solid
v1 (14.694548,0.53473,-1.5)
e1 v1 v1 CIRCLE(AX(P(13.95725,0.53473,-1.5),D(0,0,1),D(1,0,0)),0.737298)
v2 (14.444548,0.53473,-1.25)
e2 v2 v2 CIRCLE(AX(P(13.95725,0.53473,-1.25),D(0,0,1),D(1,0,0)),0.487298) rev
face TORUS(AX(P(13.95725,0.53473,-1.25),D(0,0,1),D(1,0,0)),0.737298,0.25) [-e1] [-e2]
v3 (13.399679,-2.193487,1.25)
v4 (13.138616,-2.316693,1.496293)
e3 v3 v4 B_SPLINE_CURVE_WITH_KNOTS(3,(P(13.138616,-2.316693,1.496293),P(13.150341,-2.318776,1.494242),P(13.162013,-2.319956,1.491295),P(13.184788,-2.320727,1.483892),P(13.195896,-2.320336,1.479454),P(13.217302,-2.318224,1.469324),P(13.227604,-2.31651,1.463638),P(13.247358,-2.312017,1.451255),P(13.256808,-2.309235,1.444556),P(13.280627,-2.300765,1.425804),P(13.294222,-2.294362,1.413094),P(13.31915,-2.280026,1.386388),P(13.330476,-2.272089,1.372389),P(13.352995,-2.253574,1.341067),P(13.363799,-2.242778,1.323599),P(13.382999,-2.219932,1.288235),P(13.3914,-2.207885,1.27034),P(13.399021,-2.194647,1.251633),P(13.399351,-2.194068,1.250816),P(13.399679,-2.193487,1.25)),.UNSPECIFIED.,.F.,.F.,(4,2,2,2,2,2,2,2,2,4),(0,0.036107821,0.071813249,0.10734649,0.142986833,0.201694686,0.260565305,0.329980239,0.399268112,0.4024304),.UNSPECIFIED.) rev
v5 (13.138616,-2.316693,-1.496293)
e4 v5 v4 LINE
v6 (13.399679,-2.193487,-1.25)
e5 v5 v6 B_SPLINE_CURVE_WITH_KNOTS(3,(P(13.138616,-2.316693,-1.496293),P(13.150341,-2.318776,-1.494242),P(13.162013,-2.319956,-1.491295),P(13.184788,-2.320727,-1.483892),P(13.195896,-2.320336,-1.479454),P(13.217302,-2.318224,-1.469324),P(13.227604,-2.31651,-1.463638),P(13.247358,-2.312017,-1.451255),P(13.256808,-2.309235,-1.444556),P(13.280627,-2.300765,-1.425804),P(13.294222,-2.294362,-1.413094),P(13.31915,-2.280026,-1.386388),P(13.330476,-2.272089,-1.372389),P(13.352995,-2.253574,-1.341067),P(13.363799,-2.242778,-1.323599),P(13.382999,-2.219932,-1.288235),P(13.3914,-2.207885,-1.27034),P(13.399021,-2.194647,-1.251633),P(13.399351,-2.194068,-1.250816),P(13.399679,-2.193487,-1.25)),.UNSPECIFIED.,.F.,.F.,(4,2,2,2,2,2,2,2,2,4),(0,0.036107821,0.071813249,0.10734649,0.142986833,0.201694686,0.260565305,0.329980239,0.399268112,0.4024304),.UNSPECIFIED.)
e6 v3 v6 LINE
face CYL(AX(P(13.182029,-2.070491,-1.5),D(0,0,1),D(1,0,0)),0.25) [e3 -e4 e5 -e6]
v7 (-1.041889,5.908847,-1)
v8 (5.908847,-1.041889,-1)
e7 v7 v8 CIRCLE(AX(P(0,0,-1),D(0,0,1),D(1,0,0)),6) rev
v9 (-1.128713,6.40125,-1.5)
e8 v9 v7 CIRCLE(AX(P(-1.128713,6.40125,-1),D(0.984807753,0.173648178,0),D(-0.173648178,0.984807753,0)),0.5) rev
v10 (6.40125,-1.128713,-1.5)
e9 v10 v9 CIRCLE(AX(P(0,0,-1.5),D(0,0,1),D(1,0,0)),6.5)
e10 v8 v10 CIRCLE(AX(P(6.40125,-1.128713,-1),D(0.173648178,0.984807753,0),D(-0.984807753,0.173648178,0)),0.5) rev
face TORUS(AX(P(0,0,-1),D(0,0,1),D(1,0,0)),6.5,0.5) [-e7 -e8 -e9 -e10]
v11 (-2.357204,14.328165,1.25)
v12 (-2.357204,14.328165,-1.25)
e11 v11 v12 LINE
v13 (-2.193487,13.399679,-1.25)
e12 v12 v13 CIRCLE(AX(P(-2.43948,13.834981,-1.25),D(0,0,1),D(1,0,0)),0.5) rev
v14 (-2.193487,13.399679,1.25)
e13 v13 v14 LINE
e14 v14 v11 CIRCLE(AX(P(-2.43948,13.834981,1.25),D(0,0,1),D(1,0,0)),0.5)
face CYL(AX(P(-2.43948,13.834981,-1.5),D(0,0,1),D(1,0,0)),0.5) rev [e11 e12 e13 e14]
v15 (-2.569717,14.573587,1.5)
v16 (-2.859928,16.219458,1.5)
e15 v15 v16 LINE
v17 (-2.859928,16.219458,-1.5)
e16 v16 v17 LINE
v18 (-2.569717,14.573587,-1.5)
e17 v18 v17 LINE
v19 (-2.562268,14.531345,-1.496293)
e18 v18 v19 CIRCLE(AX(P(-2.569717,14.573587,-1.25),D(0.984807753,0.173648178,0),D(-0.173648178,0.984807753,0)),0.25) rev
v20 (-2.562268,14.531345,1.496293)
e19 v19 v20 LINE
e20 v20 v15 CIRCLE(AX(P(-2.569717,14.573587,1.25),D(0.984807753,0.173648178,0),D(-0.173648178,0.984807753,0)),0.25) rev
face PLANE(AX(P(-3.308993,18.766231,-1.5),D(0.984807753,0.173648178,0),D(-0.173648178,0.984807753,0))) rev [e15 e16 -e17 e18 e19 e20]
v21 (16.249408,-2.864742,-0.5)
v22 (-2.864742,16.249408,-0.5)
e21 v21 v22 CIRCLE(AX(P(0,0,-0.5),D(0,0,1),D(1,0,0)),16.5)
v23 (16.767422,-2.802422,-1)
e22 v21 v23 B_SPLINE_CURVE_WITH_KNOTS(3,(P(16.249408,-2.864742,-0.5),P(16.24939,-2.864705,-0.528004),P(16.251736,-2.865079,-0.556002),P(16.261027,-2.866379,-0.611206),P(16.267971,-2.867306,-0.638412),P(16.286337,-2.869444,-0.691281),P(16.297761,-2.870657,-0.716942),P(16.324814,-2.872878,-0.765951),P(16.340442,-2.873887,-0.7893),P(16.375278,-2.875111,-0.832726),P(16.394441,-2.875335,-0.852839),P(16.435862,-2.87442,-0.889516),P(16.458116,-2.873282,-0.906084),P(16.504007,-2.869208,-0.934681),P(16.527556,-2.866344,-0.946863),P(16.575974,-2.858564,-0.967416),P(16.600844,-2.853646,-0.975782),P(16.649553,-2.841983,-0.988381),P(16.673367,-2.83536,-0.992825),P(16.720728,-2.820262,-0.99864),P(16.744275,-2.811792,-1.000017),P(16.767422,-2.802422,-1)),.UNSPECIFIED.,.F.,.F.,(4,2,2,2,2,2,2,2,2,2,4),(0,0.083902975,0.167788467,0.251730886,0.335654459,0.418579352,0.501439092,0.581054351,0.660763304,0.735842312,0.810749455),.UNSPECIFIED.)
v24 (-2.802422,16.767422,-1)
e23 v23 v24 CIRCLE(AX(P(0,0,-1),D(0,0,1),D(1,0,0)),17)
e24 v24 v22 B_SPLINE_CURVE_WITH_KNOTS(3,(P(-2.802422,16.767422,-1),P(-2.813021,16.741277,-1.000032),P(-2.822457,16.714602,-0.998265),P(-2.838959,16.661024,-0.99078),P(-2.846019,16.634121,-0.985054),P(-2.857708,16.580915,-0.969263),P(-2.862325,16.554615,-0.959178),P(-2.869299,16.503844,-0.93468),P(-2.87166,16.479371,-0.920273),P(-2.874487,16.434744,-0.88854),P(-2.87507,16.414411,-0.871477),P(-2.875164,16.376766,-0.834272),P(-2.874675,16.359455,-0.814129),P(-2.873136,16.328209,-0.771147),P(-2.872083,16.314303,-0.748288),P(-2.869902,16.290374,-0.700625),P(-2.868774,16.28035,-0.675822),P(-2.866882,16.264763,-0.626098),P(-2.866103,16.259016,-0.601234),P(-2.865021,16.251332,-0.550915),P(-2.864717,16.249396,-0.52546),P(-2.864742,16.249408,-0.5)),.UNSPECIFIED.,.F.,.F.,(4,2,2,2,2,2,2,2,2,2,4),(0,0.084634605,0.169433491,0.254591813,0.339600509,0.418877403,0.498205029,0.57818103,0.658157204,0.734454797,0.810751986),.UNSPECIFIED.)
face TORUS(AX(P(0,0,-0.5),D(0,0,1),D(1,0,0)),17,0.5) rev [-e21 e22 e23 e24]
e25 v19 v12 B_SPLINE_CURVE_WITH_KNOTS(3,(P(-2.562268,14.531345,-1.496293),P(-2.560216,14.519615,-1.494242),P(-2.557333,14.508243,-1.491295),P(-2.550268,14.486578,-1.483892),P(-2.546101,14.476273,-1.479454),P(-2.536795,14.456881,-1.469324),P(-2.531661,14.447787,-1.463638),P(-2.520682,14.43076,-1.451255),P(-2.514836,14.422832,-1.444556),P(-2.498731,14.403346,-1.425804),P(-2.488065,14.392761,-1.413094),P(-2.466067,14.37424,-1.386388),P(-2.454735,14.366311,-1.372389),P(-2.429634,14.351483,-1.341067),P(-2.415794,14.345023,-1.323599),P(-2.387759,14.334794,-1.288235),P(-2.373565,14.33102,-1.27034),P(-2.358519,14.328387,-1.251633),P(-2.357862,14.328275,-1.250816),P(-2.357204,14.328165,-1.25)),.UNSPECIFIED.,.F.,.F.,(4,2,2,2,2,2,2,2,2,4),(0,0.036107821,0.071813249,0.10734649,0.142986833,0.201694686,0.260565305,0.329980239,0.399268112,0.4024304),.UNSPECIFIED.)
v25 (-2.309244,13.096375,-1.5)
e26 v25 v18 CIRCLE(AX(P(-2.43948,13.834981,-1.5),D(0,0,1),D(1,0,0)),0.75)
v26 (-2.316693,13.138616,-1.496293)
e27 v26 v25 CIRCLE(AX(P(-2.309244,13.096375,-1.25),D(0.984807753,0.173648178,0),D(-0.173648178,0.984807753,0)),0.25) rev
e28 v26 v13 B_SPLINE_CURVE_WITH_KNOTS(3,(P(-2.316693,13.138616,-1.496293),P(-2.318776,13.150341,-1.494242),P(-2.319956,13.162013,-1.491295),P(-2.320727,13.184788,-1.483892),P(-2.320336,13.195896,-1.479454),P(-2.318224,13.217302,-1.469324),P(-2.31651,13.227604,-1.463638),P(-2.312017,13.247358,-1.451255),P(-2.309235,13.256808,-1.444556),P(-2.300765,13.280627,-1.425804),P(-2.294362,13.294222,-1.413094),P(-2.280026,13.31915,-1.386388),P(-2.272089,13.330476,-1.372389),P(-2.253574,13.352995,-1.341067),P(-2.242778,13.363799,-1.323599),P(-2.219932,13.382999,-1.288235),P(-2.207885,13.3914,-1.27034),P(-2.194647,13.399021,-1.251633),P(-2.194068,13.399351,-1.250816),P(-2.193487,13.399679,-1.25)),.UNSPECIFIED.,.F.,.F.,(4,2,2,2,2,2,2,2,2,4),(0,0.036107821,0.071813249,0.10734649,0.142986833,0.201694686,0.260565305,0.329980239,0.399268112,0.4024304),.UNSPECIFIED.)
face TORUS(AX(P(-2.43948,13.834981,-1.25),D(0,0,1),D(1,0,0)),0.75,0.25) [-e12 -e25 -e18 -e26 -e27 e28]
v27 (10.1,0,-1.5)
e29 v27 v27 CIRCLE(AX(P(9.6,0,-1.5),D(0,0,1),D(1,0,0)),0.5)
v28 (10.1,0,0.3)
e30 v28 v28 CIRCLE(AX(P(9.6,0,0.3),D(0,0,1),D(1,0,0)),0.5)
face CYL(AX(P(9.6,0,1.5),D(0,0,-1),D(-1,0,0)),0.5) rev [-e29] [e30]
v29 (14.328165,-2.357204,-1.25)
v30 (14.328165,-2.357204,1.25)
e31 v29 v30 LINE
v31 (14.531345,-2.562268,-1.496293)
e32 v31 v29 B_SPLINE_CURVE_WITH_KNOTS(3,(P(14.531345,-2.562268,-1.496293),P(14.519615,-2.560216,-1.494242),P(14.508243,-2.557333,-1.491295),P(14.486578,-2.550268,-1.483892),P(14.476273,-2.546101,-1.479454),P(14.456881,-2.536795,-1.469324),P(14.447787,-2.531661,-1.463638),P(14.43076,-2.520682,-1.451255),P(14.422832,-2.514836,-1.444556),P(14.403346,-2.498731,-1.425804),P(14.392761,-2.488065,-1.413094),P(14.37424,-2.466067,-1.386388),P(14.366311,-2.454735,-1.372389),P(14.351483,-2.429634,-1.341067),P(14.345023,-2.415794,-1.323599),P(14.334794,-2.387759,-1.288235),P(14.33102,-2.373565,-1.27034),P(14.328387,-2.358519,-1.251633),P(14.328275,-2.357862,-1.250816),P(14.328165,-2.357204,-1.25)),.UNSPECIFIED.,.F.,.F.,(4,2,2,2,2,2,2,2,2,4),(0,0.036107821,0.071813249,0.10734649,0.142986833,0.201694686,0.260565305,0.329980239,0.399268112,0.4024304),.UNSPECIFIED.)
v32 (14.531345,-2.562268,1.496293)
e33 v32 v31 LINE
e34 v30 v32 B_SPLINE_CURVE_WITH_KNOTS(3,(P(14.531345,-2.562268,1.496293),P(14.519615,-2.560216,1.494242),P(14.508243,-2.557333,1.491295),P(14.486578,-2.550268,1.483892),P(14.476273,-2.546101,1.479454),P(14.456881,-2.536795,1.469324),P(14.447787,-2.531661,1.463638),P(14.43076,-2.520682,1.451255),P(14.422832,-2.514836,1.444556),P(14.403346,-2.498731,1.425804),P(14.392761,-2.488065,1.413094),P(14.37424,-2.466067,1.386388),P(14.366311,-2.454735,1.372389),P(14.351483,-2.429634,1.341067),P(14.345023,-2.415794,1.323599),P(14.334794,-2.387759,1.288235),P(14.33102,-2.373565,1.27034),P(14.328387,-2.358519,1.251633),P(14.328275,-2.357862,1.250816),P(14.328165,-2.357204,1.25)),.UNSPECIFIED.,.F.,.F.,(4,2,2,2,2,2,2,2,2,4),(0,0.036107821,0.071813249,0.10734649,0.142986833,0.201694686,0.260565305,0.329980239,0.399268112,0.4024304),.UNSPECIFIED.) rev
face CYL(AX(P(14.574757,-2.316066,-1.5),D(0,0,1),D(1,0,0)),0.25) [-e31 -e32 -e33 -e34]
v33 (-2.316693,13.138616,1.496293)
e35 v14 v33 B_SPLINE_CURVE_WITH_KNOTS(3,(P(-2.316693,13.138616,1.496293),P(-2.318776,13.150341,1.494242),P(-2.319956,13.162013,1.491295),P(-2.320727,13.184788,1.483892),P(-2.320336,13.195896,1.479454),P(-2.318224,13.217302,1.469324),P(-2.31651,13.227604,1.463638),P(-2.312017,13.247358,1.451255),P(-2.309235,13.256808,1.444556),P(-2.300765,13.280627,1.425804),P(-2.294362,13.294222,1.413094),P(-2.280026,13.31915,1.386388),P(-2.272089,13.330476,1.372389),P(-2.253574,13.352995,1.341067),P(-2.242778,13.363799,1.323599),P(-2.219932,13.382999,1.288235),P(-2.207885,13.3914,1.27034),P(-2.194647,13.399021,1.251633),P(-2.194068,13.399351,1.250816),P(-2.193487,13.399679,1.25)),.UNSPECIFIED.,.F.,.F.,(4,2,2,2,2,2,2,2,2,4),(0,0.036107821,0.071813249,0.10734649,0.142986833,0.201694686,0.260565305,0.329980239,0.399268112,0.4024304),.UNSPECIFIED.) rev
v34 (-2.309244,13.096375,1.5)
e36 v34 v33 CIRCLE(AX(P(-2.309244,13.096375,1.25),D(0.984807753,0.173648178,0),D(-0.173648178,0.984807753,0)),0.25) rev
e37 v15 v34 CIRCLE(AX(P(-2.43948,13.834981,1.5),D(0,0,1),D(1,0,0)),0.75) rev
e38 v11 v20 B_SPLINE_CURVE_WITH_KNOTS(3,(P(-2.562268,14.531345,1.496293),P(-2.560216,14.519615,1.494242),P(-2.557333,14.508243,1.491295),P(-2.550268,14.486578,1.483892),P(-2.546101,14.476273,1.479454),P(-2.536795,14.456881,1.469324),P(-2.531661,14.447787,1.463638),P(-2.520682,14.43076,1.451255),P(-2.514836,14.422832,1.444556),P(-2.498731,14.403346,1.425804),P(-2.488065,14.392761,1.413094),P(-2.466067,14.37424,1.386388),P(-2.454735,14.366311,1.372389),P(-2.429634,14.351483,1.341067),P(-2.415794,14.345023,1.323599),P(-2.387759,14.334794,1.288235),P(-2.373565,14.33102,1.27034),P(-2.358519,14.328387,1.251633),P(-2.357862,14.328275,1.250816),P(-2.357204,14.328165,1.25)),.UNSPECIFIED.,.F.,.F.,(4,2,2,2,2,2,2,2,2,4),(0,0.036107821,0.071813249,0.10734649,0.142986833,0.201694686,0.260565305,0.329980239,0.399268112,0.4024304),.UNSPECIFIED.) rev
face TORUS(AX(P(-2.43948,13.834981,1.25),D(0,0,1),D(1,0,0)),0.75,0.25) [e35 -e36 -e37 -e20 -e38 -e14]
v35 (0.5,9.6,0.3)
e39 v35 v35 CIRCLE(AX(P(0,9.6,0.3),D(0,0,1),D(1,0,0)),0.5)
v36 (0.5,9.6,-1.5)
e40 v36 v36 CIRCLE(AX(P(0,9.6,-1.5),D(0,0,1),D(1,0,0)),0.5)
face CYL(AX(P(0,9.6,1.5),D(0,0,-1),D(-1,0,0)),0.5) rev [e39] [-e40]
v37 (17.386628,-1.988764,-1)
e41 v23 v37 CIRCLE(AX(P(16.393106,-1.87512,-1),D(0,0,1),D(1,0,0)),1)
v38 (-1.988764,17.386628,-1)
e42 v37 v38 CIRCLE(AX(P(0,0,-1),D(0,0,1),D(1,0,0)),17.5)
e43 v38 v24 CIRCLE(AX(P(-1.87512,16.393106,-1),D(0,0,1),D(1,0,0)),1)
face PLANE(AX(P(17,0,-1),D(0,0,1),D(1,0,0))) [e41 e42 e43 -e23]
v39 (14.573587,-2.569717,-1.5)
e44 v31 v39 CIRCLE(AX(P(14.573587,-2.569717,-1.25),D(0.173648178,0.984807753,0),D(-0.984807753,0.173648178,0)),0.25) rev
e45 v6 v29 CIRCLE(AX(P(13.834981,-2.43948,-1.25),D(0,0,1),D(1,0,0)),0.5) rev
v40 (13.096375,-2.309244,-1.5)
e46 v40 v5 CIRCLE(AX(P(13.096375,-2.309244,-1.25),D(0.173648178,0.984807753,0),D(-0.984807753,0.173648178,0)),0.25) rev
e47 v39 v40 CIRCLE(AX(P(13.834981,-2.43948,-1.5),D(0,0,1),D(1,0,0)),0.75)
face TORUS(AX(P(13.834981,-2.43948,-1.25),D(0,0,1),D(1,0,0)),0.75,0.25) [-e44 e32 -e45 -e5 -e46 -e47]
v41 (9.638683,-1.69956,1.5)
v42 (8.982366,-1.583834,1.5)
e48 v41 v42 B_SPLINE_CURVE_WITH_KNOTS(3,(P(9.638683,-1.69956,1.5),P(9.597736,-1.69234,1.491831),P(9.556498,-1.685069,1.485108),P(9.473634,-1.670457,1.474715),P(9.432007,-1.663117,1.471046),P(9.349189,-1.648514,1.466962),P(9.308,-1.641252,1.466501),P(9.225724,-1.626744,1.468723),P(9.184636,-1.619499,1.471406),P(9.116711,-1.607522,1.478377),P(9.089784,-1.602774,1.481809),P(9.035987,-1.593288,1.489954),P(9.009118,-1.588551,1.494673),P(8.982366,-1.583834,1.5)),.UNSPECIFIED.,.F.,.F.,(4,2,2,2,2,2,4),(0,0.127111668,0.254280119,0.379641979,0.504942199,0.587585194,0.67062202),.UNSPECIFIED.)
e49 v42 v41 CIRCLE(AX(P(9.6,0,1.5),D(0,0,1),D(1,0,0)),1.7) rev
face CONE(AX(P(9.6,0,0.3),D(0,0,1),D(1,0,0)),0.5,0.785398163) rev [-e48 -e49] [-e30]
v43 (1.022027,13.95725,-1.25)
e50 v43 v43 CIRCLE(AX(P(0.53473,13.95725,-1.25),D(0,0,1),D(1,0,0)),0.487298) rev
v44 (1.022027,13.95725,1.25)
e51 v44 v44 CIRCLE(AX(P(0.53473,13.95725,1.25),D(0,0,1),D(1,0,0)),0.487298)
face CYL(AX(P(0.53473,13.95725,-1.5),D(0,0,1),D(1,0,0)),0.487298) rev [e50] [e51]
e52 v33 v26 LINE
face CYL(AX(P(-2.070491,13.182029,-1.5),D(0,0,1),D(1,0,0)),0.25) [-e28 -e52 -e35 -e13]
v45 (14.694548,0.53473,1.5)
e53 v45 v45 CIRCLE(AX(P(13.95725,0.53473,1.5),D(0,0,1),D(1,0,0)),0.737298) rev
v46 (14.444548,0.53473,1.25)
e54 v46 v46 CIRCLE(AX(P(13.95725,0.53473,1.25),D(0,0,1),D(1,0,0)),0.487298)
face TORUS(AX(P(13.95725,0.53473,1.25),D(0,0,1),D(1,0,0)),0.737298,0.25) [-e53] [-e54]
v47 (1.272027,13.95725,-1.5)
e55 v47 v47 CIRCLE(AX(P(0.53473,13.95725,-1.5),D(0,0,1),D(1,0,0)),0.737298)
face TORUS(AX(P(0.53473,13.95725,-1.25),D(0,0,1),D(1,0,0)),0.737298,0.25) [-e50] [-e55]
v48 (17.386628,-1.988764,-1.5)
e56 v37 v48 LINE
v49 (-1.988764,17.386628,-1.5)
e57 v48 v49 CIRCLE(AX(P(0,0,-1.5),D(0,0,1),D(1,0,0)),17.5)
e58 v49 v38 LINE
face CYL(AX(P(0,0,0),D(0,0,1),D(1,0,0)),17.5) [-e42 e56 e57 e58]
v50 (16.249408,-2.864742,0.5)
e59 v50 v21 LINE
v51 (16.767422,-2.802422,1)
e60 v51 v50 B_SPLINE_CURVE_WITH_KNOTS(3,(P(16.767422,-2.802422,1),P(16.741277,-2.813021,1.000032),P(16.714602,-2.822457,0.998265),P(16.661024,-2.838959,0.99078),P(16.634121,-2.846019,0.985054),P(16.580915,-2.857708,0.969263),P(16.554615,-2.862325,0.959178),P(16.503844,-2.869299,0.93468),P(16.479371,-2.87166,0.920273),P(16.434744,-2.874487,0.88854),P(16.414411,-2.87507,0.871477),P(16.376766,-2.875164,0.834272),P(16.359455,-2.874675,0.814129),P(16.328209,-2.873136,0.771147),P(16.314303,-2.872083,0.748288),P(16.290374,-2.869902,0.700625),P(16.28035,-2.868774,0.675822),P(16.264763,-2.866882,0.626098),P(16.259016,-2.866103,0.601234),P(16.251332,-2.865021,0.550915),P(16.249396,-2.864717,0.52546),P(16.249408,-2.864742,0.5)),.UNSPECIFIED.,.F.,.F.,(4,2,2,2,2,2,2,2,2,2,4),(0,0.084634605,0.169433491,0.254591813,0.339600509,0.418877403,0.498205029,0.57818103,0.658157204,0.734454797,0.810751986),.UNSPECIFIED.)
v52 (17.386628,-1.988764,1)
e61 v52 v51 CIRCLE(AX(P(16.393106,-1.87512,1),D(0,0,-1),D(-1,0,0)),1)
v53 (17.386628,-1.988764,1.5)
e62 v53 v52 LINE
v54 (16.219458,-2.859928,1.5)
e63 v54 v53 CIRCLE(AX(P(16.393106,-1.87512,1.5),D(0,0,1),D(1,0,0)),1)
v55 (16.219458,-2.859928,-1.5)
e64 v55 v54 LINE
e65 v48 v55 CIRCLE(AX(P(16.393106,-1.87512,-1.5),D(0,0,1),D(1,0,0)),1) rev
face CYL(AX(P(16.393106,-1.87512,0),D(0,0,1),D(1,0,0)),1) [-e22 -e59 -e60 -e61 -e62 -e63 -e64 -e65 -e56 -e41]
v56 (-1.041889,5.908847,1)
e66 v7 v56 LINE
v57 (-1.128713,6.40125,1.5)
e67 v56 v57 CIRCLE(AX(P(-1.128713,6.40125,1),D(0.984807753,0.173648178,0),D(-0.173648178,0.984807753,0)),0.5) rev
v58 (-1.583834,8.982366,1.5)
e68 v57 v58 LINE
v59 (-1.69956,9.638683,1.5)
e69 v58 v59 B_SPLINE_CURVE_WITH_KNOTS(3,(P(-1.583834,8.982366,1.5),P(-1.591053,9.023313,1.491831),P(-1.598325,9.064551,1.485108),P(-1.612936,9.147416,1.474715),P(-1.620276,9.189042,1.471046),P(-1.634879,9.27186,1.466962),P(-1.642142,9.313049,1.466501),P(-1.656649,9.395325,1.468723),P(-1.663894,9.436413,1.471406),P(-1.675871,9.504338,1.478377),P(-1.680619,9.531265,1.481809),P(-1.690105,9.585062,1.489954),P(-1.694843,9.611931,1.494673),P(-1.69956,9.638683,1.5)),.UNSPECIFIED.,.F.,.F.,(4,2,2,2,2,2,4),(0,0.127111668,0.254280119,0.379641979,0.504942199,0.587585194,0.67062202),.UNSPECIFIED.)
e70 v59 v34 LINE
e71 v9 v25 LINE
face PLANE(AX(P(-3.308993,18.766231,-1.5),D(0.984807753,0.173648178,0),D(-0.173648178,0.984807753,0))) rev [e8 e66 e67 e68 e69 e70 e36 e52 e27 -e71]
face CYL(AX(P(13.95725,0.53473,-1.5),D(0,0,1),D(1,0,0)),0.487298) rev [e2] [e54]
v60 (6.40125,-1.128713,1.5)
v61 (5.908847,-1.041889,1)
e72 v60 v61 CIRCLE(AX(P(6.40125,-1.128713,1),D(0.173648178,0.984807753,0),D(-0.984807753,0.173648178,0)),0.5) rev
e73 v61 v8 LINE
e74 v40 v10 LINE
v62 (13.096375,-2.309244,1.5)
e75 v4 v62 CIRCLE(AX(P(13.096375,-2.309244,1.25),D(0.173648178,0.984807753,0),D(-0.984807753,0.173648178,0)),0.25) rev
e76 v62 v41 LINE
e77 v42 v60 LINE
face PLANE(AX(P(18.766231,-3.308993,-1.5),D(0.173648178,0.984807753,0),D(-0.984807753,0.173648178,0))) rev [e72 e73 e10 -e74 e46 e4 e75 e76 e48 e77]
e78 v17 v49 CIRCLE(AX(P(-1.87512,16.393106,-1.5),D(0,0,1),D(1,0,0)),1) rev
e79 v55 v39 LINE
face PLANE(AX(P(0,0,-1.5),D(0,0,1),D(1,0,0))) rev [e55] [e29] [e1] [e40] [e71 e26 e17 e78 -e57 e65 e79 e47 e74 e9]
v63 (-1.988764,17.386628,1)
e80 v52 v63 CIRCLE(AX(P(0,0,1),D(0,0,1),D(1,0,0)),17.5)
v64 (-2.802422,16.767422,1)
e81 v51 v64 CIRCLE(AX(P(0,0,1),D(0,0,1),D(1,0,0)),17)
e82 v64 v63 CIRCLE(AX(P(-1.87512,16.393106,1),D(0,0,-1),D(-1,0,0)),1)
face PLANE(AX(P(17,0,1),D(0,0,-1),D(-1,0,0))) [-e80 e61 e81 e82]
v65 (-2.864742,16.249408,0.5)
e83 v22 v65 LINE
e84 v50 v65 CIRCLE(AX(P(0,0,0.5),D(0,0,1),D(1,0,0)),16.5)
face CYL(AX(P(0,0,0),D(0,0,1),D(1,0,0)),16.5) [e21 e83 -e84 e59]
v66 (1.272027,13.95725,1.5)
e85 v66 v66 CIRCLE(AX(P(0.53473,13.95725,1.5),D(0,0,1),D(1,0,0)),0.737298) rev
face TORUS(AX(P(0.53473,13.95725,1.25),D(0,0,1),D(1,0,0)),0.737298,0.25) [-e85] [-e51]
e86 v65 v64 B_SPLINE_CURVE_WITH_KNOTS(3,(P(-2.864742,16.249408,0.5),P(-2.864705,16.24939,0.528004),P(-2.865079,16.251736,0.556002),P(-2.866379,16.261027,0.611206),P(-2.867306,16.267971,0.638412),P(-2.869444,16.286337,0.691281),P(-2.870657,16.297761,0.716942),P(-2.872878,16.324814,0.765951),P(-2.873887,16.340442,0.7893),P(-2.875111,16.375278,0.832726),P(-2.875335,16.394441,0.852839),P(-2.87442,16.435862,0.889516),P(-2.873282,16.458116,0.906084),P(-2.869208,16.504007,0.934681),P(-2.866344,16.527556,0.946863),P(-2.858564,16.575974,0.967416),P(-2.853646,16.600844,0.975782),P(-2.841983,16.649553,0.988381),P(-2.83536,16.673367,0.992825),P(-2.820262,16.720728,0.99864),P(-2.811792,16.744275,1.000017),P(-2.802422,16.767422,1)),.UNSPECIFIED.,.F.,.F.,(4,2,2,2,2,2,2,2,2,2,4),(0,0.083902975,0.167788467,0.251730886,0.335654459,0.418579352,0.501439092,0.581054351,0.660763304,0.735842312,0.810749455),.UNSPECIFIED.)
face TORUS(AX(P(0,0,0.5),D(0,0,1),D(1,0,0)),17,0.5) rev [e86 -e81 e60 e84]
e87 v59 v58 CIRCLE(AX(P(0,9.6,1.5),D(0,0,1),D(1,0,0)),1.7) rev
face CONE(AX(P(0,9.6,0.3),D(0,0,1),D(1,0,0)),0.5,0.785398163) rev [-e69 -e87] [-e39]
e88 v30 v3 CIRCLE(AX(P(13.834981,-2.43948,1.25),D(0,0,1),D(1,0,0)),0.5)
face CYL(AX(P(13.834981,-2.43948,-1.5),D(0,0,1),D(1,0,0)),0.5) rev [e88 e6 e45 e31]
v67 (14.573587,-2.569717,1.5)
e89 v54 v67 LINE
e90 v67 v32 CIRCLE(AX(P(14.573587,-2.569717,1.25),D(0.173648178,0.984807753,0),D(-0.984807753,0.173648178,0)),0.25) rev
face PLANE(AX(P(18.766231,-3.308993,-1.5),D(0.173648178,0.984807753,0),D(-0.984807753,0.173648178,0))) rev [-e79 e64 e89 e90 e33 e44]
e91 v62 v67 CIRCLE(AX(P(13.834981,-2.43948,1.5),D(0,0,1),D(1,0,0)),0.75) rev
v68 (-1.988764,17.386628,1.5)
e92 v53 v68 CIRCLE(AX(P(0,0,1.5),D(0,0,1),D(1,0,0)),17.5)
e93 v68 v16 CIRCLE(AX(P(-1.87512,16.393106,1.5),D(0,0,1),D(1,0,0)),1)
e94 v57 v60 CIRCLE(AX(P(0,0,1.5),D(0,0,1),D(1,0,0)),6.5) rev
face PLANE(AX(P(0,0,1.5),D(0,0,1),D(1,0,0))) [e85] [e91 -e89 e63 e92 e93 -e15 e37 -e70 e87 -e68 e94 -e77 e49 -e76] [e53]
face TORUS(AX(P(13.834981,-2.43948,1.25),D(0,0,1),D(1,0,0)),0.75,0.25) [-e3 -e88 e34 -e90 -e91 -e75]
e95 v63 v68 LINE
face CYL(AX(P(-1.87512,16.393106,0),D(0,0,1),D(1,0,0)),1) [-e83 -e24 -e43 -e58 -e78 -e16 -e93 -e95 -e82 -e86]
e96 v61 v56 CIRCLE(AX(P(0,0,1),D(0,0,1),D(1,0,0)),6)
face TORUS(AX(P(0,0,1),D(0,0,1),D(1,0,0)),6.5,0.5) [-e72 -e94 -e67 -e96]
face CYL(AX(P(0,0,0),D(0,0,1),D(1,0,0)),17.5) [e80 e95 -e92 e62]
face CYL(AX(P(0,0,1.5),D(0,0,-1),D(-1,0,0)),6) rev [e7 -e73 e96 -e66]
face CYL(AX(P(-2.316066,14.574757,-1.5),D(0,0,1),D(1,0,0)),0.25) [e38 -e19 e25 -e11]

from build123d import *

# Parameters (mm, degrees)
SKETCH1_R               = 17
SKETCH1_R_2             = 0.5
SKETCH1_R_3             = 6
BOSS_EXTRUDE1_DEPTH     = 1.5
SKETCH7_W               = 0.5
SKETCH7_H               = 0.5
CUT_EXTRUDE1_DEPTH      = 25.794152536
CUT_EXTRUDE1_DEPTH_BACK = 25.794152536
CUT_EXTRUDE2_DEPTH      = 25.929901725
CUT_EXTRUDE2_DEPTH_BACK = 25.929901725
SKETCH5_R               = 0.5
SKETCH5_R_2             = 0.48729794
FILLET1_R               = 0.5
CHAMFER1_SIZE           = 1.2
FILLET2_R               = 1
FILLET3_R               = 0.25


with BuildPart() as part:
    # Sketch1 → Boss-Extrude1 (new, symmetric)
    with BuildSketch(Plane.XY):
        Circle(SKETCH1_R)
        with Locations((9.6, 0)):
            Circle(SKETCH1_R_2, mode=Mode.SUBTRACT)
        Circle(SKETCH1_R_3, mode=Mode.SUBTRACT)
        with Locations((0, -9.6)):
            Circle(SKETCH1_R_2, mode=Mode.SUBTRACT)
        with Locations((-9.6, 0)):
            Circle(SKETCH1_R_2, mode=Mode.SUBTRACT)
        with Locations((0, 9.6)):
            Circle(SKETCH1_R_2, mode=Mode.SUBTRACT)
    extrude(amount=BOSS_EXTRUDE1_DEPTH, both=True)

    # Sketch2 → Cut-Revolve1 (revolve, cut)
    with BuildSketch(Plane(origin=(0, 0, 0), x_dir=(1, 0, 0), z_dir=(0, 1, 0)), mode=Mode.PRIVATE) as cut_revolve1_sk:
        with BuildLine():
            Line((-16.5, -0.5), (-16.5, 0.5))
            ThreePointArc((-16.5, 0.5), (-16.646446609, 0.853553391), (-17, 1))
            Line((-17, 1), (-17, -1))
            ThreePointArc((-17, -1), (-16.646446609, -0.853553391), (-16.5, -0.5))
        make_face()
    revolve(cut_revolve1_sk.sketch.rotate(Axis((0, 0, 0), (0, 0, -1)), 180), axis=Axis((0, 0, 0), (0, 0, -1)), mode=Mode.SUBTRACT)

    # Sketch7 → Revolve1 (revolve)
    with BuildSketch(Plane(origin=(0, 0, 0), x_dir=(1, 0, 0), z_dir=(0, 1, 0))):
        with Locations((17.25, 1.25)):
            Rectangle(SKETCH7_W, SKETCH7_H)
        with Locations((17.25, -1.25)):
            Rectangle(SKETCH7_W, SKETCH7_H)
    revolve(axis=Axis((0, 0, 0), (0, 0, -1)))

    # Sketch4 → Cut-Extrude1 (cut, two sides: drawn at the far end of the back side and taken through both)
    with BuildSketch(Plane.XY.offset(-CUT_EXTRUDE1_DEPTH_BACK)):
        Polygon((-3.30899291, 18.766231333), (0, 0), (18.766231333, -3.30899291), (18.766231333, -21.784688157), (-24.932091475, -21.784688157), (-24.932091475, 18.766231333), align=None)
    extrude(amount=CUT_EXTRUDE1_DEPTH + CUT_EXTRUDE1_DEPTH_BACK, mode=Mode.SUBTRACT)

    # Sketch5 → Cut-Extrude2 (cut, two sides: drawn at the far end of the back side and taken through both)
    with BuildSketch(Plane.XY.offset(1.5).offset(-CUT_EXTRUDE2_DEPTH_BACK)):
        with Locations((-2.439480379, 13.834980723)):
            Circle(SKETCH5_R)
        with Locations((0.534729508, 13.957250241)):
            Circle(SKETCH5_R_2)
        with Locations((13.957250241, 0.534729508)):
            Circle(SKETCH5_R_2)
        with Locations((13.834980723, -2.439480379)):
            Circle(SKETCH5_R)
    extrude(amount=CUT_EXTRUDE2_DEPTH + CUT_EXTRUDE2_DEPTH_BACK, mode=Mode.SUBTRACT)

    # Fillet1
    fillet1_edges = [part.edges().sort_by_distance(p)[0] for p in [
        (4.242640687, 4.242640687, 1.5),
        (4.242640687, 4.242640687, -1.5),
    ]]
    fillet(fillet1_edges, radius=FILLET1_R)

    # Chamfer1
    # the kernel refuses this chamfer: 1.2 mm, written as the material it takes off along each edge
    with BuildSketch(Plane(origin=(9.6, 0, 1.5), x_dir=(1, 0, 0), z_dir=(0, -1, 0))) as chamfer1_piece_1:
        Polygon((0.5 + CHAMFER1_SIZE, 0), (0.5, -CHAMFER1_SIZE), (0.5, 0), align=None)
    revolve(axis=Axis((9.6, 0, 1.5), (0, 0, 1)), mode=Mode.SUBTRACT)
    with BuildSketch(Plane(origin=(0, 9.6, 1.5), x_dir=(1, 0, 0), z_dir=(0, -1, 0))) as chamfer1_piece_2:
        Polygon((0.5 + CHAMFER1_SIZE, 0), (0.5, -CHAMFER1_SIZE), (0.5, 0), align=None)
    revolve(axis=Axis((0, 9.6, 1.5), (0, 0, 1)), mode=Mode.SUBTRACT)

    # Fillet2
    # the kernel refuses this fillet: 1 mm, written as the material it takes off along each edge
    with BuildSketch(Plane(origin=(17.234135678, -3.038843109, 4.15273452), x_dir=(0.1437119745897139, 0.9896195573853244, 0), z_dir=(0, 0, -1))) as fillet2_piece_1:
        with BuildLine():
            CenterArc((1.030776842, -0.999540335), FILLET2_R, 88.262699603, 93.474600793)
            Line((0.031236507, -1.029857301), (0, 0))
            ThreePointArc((0, 0), (0.530546904, 0.008044135), (1.061093808, 0))
        make_face()
    extrude(amount=5.805469041, mode=Mode.SUBTRACT)
    with BuildSketch(Plane(origin=(-3.038843109, 17.234135678, -4.15273452), x_dir=(0.17364817766692695, -0.9848077530122086, 0), z_dir=(0, 0, 1))) as fillet2_piece_2:
        with BuildLine():
            CenterArc((1.030330908, 1), FILLET2_R, 176.525399207, 93.474600793)
            ThreePointArc((0.032169145, 1.060606061), (0.008044135, 0.530546904), (0, 0))
            Line((0, 0), (1.030330908, 0))
        make_face()
    extrude(amount=5.805469041, mode=Mode.SUBTRACT)

    # Fillet3
    fillet3_edges = [part.edges().sort_by_distance(p)[0] for p in [
        (13.921804812, -1.947076503, -1.5),
        (13.921804812, -1.947076503, 1.5),
        (14.3273846, -2.526304468, 0),
        (13.342576847, -2.35265629, 0),
        (-2.35265629, 13.342576847, 0),
        (-2.526304468, 14.3273846, 0),
        (-1.947076503, 13.921804812, -1.5),
        (-1.947076503, 13.921804812, 1.5),
        (0.047431568, 13.957250241, 1.5),
        (0.047431568, 13.957250241, -1.5),
        (13.469952302, 0.534729508, 1.5),
        (13.469952302, 0.534729508, -1.5),
    ]]
    fillet(fillet3_edges, radius=FILLET3_R)


solid = part.part
